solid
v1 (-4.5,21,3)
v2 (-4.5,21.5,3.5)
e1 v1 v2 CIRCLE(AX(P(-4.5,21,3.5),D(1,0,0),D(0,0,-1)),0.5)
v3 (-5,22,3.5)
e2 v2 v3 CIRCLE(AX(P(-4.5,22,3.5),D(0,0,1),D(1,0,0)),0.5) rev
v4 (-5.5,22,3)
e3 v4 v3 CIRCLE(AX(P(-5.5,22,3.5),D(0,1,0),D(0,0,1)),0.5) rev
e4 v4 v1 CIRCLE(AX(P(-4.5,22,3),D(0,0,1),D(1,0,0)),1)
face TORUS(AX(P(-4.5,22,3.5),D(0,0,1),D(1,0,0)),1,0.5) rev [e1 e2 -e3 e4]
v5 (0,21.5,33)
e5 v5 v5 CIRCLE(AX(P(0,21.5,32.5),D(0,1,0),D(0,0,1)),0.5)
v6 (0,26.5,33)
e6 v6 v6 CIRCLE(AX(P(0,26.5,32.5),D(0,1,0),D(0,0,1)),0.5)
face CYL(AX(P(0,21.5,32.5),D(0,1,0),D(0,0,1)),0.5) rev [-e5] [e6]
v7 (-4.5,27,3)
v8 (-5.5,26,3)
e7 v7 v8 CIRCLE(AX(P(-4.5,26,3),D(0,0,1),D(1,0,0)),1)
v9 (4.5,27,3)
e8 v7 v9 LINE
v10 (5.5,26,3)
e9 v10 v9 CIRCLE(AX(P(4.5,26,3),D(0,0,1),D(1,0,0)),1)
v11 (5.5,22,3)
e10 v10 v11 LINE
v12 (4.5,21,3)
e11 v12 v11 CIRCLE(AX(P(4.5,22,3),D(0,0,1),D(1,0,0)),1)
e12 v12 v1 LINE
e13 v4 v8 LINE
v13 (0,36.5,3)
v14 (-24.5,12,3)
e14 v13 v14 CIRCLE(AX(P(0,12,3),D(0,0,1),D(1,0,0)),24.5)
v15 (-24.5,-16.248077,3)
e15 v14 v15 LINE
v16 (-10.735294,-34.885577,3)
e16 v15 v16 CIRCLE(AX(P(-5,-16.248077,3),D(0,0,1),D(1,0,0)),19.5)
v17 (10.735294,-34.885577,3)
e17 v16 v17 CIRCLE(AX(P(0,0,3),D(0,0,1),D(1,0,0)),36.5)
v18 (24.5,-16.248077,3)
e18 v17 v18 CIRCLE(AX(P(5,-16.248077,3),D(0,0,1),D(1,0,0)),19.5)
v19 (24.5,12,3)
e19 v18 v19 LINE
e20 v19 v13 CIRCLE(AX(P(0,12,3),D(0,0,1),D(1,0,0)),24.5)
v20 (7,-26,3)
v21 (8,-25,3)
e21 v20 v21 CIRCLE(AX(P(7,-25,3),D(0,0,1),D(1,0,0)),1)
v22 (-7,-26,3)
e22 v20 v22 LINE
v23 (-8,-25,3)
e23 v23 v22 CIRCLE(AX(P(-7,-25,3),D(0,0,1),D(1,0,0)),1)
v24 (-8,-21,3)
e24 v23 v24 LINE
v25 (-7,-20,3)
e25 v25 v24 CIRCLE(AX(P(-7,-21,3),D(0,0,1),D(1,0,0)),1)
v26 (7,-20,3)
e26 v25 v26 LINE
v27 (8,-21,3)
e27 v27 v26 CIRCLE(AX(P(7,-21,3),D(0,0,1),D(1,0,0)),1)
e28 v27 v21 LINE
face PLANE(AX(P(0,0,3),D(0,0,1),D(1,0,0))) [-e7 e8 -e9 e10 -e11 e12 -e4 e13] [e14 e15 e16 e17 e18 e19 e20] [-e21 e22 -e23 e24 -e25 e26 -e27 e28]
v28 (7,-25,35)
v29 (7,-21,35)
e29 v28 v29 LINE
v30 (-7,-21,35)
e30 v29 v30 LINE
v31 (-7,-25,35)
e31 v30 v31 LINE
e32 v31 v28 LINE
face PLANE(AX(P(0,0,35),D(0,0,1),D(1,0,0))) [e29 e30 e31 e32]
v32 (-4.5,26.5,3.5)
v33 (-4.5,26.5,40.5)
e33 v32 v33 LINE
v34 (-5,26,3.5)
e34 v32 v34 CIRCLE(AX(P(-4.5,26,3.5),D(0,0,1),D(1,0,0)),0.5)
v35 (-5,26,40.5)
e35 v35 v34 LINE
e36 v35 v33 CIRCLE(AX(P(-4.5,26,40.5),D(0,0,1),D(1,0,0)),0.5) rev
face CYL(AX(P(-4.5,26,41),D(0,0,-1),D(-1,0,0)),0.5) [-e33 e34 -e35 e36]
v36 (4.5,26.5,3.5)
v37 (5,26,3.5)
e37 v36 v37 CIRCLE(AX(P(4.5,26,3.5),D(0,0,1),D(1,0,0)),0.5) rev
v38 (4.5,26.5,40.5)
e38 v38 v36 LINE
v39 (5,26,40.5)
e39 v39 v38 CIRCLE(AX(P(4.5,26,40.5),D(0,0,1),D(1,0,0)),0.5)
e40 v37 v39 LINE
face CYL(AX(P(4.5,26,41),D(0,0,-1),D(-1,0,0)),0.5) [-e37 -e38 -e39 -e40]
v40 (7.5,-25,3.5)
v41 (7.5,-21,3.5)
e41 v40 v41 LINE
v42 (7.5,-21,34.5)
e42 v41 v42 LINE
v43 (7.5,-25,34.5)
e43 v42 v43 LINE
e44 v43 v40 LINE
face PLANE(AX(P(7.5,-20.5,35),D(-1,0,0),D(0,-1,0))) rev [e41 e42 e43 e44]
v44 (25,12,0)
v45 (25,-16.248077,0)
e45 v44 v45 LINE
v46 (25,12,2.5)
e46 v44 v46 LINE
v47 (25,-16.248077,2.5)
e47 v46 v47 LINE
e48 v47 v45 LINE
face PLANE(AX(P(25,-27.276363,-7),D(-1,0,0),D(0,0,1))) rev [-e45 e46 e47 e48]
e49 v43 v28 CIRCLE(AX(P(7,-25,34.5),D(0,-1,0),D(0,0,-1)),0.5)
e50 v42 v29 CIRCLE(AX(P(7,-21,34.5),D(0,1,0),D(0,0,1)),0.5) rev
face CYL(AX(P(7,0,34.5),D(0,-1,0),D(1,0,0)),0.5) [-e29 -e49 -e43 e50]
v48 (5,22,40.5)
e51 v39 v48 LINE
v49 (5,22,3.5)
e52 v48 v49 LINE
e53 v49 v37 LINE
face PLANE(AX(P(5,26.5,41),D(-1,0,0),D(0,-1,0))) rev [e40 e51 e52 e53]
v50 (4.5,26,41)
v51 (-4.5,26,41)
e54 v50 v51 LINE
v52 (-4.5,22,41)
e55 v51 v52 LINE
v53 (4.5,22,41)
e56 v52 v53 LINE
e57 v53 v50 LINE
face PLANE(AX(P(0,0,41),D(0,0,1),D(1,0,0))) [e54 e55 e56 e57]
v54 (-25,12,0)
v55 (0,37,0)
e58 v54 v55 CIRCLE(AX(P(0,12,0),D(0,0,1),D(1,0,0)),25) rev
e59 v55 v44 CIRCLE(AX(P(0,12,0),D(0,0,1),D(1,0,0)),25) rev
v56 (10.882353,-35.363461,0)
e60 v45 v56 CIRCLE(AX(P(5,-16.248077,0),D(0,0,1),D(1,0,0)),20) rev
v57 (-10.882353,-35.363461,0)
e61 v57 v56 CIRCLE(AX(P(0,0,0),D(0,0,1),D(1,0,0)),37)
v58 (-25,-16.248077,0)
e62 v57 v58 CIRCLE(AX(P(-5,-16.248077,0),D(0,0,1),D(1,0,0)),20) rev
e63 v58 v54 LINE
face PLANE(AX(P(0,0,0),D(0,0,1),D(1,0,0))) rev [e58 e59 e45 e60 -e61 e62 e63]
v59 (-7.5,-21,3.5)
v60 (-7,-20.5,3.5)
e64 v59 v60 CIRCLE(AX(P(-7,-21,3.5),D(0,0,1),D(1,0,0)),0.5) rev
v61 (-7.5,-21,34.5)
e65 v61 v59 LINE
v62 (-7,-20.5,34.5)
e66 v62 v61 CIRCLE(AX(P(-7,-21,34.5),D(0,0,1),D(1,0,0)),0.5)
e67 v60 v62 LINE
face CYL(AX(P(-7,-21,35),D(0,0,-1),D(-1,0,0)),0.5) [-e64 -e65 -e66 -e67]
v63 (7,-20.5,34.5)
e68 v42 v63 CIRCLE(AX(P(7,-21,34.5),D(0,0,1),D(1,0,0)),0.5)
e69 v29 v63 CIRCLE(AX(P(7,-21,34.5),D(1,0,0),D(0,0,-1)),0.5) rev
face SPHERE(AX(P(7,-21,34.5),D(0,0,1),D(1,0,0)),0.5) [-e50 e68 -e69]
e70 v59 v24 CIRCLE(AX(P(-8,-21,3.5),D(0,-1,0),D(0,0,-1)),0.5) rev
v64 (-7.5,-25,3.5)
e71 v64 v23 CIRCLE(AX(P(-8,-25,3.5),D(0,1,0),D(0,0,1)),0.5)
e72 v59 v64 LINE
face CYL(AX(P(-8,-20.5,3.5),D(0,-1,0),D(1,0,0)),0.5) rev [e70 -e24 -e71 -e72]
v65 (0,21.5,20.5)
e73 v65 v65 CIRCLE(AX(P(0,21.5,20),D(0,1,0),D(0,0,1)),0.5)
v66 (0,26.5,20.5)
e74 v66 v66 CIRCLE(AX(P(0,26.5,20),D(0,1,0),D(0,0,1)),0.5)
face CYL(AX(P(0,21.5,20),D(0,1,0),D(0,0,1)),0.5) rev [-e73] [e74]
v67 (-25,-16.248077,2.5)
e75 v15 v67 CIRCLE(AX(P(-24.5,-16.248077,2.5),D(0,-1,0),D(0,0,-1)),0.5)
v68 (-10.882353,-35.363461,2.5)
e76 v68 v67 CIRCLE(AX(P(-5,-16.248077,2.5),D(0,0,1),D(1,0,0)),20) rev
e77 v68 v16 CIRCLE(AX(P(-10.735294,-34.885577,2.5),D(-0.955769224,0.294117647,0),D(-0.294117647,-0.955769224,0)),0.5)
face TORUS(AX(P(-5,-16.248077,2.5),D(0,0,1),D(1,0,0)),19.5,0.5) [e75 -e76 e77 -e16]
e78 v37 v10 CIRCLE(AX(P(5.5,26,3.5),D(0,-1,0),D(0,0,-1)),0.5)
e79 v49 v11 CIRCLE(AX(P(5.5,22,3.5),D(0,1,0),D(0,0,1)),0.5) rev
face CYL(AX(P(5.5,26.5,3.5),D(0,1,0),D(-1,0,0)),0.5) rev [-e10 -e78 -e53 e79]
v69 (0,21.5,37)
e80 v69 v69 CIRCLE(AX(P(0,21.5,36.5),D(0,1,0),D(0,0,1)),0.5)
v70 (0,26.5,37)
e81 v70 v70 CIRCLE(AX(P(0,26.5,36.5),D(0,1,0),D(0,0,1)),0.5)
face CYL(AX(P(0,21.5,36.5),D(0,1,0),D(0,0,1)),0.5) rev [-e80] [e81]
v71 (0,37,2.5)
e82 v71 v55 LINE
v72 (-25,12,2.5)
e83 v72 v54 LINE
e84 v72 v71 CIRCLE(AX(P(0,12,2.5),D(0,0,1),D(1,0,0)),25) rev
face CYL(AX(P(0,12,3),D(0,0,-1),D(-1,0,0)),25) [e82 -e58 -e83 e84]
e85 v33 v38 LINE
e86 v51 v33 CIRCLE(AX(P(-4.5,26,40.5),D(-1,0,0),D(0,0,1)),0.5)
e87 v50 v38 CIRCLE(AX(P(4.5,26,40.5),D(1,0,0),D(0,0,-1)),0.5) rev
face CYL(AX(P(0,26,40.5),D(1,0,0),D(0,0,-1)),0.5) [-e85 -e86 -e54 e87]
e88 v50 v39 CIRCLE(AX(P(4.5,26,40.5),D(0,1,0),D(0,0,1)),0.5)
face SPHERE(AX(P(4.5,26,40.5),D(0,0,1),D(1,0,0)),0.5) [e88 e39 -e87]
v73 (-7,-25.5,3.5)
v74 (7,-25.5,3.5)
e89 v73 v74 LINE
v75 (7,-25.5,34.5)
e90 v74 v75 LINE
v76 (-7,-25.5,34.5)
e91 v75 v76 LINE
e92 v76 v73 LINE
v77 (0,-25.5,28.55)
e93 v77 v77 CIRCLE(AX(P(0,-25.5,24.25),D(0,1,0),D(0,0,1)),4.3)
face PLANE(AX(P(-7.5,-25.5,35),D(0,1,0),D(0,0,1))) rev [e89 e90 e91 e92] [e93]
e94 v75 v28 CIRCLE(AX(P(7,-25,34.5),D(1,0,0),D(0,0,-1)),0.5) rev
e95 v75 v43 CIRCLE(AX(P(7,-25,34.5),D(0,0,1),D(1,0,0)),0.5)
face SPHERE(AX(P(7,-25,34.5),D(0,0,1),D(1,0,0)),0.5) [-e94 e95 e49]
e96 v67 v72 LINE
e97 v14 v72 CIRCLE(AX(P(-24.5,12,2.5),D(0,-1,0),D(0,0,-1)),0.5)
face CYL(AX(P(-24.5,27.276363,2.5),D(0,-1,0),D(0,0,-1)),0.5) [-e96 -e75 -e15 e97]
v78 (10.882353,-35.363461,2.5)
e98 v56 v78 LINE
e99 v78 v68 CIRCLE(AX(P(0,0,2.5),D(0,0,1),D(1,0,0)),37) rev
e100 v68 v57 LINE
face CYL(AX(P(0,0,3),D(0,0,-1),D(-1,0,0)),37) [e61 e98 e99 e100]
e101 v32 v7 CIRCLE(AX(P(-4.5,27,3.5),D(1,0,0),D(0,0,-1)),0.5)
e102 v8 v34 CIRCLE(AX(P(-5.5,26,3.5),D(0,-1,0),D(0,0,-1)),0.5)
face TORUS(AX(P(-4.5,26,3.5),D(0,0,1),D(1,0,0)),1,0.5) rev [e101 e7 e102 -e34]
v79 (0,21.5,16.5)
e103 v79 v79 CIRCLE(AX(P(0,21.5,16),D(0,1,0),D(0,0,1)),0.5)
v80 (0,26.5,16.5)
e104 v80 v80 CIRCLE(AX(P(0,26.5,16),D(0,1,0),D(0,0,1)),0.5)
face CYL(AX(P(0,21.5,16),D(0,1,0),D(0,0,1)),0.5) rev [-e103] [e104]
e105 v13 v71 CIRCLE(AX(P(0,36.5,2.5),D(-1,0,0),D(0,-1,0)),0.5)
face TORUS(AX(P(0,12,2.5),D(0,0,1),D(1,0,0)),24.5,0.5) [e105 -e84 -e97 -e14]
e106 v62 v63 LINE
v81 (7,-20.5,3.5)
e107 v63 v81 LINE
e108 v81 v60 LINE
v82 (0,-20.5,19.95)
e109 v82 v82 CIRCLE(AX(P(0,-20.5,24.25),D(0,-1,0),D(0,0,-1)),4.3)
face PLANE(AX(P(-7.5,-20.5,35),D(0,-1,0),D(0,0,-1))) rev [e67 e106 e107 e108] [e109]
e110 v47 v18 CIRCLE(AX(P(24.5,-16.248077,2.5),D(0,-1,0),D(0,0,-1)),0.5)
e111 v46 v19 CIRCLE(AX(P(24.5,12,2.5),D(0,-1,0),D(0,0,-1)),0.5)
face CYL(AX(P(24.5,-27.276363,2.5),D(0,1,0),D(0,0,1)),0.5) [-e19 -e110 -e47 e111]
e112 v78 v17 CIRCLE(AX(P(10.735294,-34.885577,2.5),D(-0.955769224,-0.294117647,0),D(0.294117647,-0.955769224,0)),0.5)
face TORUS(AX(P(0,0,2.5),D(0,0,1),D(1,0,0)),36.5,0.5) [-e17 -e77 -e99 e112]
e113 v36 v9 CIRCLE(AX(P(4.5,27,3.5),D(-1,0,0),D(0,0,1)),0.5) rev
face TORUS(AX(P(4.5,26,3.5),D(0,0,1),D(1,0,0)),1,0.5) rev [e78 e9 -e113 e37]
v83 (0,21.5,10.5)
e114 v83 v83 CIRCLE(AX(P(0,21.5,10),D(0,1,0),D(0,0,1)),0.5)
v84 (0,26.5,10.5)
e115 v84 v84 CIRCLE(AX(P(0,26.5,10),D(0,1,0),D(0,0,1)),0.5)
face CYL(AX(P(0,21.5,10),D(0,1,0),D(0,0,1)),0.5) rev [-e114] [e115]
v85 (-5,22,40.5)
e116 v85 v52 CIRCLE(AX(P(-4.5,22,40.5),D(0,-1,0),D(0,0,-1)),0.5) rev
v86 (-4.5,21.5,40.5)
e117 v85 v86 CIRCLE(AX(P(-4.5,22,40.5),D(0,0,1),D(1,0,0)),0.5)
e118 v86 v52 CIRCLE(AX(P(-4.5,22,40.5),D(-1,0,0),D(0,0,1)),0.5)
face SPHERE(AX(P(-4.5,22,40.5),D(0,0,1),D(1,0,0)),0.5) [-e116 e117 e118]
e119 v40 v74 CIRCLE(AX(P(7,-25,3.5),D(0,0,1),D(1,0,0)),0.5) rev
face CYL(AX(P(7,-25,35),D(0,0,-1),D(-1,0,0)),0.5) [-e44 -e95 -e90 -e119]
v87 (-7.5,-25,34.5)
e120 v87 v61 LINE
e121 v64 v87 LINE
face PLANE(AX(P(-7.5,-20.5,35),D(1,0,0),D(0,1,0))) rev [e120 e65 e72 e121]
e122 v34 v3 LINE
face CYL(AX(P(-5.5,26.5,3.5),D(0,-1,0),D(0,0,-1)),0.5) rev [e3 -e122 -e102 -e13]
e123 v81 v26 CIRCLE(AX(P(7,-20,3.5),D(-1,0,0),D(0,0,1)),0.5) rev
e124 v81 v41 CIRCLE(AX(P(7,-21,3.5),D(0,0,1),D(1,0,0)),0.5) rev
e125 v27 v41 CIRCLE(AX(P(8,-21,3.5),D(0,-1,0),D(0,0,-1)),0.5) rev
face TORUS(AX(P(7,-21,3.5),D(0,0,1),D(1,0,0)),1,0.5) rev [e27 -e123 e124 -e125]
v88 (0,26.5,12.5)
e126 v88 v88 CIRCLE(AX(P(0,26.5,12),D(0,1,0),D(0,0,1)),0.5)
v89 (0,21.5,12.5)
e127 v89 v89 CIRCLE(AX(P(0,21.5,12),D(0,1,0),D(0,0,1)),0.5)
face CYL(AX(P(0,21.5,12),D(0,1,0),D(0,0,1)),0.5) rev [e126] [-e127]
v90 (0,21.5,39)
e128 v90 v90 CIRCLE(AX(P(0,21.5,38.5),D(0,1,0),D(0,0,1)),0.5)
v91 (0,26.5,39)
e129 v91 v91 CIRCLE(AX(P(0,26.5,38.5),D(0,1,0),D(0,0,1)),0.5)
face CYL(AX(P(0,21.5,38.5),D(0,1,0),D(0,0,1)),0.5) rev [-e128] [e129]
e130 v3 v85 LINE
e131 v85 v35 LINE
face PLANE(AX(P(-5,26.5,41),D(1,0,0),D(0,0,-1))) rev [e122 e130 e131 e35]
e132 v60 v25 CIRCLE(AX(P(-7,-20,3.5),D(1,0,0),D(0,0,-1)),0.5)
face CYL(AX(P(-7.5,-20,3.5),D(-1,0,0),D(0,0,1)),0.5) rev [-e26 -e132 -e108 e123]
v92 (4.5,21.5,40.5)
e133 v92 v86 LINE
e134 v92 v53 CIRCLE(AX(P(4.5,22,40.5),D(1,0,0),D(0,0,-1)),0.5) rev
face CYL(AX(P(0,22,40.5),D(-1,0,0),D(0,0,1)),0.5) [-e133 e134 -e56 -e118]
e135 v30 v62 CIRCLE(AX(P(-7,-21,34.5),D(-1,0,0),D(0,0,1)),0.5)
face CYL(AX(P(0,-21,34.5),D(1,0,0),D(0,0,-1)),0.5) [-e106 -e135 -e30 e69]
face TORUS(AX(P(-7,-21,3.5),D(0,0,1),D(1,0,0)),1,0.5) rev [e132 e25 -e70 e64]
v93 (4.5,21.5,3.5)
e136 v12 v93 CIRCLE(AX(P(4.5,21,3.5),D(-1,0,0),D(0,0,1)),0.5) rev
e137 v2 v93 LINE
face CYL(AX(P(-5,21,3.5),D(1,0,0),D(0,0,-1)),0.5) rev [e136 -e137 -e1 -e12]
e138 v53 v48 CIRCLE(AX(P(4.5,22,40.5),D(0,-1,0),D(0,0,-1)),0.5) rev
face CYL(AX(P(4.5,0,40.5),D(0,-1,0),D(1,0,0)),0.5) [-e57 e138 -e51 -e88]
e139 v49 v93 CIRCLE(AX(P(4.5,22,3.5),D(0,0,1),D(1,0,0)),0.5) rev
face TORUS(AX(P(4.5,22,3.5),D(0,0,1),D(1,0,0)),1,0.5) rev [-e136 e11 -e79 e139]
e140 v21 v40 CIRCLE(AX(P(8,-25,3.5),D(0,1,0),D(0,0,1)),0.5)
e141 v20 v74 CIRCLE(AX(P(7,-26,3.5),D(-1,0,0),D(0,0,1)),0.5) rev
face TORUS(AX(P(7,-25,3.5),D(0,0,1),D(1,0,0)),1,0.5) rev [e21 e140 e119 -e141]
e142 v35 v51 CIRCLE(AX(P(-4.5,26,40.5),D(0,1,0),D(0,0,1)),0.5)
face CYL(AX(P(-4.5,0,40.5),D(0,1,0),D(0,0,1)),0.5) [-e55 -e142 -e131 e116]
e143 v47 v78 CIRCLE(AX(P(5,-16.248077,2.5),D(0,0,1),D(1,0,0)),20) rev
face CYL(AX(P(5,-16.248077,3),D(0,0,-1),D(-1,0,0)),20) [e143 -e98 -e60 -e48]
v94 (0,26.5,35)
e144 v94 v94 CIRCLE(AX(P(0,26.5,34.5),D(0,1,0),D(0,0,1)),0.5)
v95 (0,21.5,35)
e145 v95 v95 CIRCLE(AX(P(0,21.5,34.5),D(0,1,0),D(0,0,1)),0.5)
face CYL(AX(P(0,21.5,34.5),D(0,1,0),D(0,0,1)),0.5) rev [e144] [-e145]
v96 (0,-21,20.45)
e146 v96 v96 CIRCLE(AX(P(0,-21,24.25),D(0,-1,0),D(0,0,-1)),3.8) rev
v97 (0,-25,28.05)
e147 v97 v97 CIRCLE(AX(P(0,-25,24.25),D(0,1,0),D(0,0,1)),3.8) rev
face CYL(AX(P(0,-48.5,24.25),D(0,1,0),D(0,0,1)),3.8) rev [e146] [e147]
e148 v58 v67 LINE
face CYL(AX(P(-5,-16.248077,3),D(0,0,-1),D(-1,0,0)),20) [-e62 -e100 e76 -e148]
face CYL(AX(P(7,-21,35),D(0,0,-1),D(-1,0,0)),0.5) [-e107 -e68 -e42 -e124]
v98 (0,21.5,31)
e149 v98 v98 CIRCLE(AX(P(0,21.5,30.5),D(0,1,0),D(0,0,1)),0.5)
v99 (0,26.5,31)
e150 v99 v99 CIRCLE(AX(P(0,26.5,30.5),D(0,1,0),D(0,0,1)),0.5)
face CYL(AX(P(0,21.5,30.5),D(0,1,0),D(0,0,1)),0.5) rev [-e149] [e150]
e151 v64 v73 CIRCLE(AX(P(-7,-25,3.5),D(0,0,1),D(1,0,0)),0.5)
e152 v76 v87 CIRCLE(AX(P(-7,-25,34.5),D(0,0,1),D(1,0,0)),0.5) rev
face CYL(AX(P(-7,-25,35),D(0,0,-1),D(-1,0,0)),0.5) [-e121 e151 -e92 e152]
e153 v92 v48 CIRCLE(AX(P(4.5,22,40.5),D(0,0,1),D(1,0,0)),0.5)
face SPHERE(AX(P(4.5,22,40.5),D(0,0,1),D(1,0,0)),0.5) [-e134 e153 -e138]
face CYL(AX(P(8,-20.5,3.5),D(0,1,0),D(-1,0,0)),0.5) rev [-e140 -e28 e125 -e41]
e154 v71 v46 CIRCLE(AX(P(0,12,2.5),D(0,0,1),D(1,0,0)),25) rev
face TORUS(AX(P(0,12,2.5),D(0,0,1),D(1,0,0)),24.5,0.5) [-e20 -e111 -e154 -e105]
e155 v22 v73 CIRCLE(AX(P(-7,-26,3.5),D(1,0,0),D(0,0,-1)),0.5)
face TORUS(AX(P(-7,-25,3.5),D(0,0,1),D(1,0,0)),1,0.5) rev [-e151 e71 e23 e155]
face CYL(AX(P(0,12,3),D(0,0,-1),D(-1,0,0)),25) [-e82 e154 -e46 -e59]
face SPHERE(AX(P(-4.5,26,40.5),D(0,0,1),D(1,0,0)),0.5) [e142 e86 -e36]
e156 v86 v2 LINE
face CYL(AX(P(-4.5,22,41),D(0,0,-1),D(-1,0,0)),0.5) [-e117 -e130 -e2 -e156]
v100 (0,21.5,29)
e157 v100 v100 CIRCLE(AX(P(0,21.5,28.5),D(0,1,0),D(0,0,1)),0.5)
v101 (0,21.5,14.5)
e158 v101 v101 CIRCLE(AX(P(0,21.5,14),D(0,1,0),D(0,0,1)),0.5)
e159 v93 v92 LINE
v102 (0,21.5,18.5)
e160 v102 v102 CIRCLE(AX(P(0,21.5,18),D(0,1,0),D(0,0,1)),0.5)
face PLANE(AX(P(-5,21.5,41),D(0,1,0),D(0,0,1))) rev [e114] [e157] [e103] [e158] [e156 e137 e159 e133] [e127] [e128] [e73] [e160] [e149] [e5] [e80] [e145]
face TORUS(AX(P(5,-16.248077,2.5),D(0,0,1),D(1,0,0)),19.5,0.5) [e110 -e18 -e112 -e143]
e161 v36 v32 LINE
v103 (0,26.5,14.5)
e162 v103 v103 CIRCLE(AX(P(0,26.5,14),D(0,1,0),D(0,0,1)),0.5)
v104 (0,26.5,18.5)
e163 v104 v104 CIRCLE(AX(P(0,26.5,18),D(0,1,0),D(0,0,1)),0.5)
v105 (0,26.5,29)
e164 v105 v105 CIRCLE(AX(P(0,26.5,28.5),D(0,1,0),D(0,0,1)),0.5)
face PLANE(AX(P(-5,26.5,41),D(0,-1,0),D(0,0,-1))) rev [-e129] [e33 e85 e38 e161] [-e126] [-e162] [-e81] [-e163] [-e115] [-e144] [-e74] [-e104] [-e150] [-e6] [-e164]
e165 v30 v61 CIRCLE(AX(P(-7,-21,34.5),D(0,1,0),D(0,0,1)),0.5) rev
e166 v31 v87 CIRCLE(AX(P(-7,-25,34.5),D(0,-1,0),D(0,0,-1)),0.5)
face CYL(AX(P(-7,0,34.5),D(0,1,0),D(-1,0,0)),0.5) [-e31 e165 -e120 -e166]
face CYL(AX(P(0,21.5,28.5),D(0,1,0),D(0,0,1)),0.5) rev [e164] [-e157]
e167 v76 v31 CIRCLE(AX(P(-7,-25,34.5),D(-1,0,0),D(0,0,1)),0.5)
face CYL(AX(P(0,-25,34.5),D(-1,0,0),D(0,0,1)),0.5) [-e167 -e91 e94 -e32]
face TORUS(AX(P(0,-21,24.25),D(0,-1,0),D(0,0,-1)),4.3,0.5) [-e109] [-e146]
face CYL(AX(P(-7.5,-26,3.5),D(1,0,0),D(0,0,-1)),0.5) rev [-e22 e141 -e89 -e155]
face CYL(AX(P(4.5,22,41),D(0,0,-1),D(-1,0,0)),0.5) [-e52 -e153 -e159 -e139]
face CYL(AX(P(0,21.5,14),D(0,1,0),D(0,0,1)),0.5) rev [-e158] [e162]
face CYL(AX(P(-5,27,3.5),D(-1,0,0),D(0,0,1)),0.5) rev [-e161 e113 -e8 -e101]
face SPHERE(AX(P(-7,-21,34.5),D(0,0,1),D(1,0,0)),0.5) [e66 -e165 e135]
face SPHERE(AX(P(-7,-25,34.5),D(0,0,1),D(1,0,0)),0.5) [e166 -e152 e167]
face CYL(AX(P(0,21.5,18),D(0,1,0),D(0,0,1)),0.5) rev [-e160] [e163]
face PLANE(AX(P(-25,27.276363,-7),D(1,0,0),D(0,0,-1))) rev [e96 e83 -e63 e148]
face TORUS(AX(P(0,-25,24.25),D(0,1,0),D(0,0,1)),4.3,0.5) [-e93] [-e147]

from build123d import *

# Parameters (mm, degrees)
SKETCH1_R           = 37
BOSS_EXTRUDE1_DEPTH = 3
CUT_EXTRUDE3_START  = -10
CUT_EXTRUDE3_DEPTH  = 10
FILLET2_R           = 25
FILLET3_R           = 20
SKETCH2_W           = 10
SKETCH2_H           = 5
BOSS_EXTRUDE2_DEPTH = 38
SKETCH3_R           = 0.5
CUT_EXTRUDE1_DEPTH  = 5
SKETCH4_W           = 15
SKETCH4_H           = 5
BOSS_EXTRUDE3_DEPTH = 32
SKETCH5_R           = 3.8
CUT_EXTRUDE2_DEPTH  = 28
FILLET4_R           = 0.5


with BuildPart() as part:
    # Sketch1 → Boss-Extrude1 (new body)
    with BuildSketch(Plane.XY):
        Circle(SKETCH1_R)
    extrude(amount=BOSS_EXTRUDE1_DEPTH)

    # Sketch6 → Cut-Extrude3 (cut)
    with BuildSketch(Plane.XY.offset(3).offset(CUT_EXTRUDE3_START)):
        with BuildLine():
            Line((-25, 27.276363394), (-25, -27.276363394))
            ThreePointArc((-25, -27.276363394), (-37, 0), (-25, 27.276363394))
        make_face()
        with BuildLine():
            Line((25, -27.276363394), (25, 27.276363394))
            ThreePointArc((25, 27.276363394), (37, 0), (25, -27.276363394))
        make_face()
    extrude(amount=CUT_EXTRUDE3_DEPTH, mode=Mode.SUBTRACT)

    # Fillet2
    fillet2_edges = [part.edges().sort_by_distance(p)[0] for p in [
        (-25, 27.276363394, 1.5),
        (25, 27.276363394, 1.5),
    ]]
    fillet(fillet2_edges, radius=FILLET2_R - 0.0001)  # a hair under: the kernel refuses the full size

    # Fillet3
    fillet3_edges = [part.edges().sort_by_distance(p)[0] for p in [
        (-25, -27.276363394, 1.5),
        (25, -27.276363394, 1.5),
    ]]
    fillet(fillet3_edges, radius=FILLET3_R)

    # Sketch2 → Boss-Extrude2 (add)
    with BuildSketch(Plane.XY.offset(3)):
        with Locations((0, 24)):
            Rectangle(SKETCH2_W, SKETCH2_H)
    extrude(amount=BOSS_EXTRUDE2_DEPTH)

    # Sketch3 → Cut-Extrude1 (cut)
    with BuildSketch(Plane(origin=(0, 26.5, 0), x_dir=(1, 0, 0), z_dir=(0, 1, 0))):
        with Locations(Location((0, -10, 0), (0, 0, 270))):
            Circle(SKETCH3_R)
        with Locations(Location((0, -12, 0), (0, 0, 270))):
            Circle(SKETCH3_R)
        with Locations(Location((0, -14, 0), (0, 0, 270))):
            Circle(SKETCH3_R)
        with Locations(Location((0, -16, 0), (0, 0, 270))):
            Circle(SKETCH3_R)
        with Locations(Location((0, -18, 0), (0, 0, 270))):
            Circle(SKETCH3_R)
        with Locations(Location((0, -20, 0), (0, 0, 270))):
            Circle(SKETCH3_R)
        with Locations(Location((0, -38.5, 0), (0, 0, 270))):
            Circle(SKETCH3_R)
        with Locations(Location((0, -36.5, 0), (0, 0, 270))):
            Circle(SKETCH3_R)
        with Locations(Location((0, -34.5, 0), (0, 0, 270))):
            Circle(SKETCH3_R)
        with Locations(Location((0, -32.5, 0), (0, 0, 270))):
            Circle(SKETCH3_R)
        with Locations(Location((0, -30.5, 0), (0, 0, 270))):
            Circle(SKETCH3_R)
        with Locations(Location((0, -28.5, 0), (0, 0, 270))):
            Circle(SKETCH3_R)
    extrude(amount=-CUT_EXTRUDE1_DEPTH, mode=Mode.SUBTRACT)

    # Sketch4 → Boss-Extrude3 (add)
    with BuildSketch(Plane.XY.offset(3)):
        with Locations((0, -23)):
            Rectangle(SKETCH4_W, SKETCH4_H)
    extrude(amount=BOSS_EXTRUDE3_DEPTH)

    # Sketch5 → Cut-Extrude2 (cut)
    with BuildSketch(Plane(origin=(0, -20.5, 0), x_dir=(1, 0, 0), z_dir=(0, 1, 0))):
        with Locations(Location((0, -24.25, 0), (0, 0, 270))):
            Circle(SKETCH5_R)
    extrude(amount=-CUT_EXTRUDE2_DEPTH, mode=Mode.SUBTRACT)

    # Fillet4
    fillet4_edges = [part.edges().sort_by_distance(p)[0] for p in [
        (7.5, -23, 3),
        (7.5, -25.5, 19),
        (0, -20.5, 3),
        (7.5, -20.5, 19),
        (-7.5, -23, 3),
        (-7.5, -20.5, 19),
        (0, -25.5, 3),
        (-7.5, -25.5, 19),
        (7.5, -23, 35),
        (0, -20.5, 35),
        (-7.5, -23, 35),
        (0, -25.5, 35),
        (0, -25.5, 20.45),
        (0, -20.5, 20.45),
        (25, -2.123988405, 3),
        (17.677772475, 29.677625162, 3),
        (-17.677772475, 29.677625162, 3),
        (0, -37, 3),
        (-25, -2.123988405, 3),
        (-21.087993331, -28.129847325, 3),
        (21.087993331, -28.129847325, 3),
        (5, 24, 3),
        (5, 21.5, 22),
        (0, 26.5, 3),
        (5, 26.5, 22),
        (-5, 24, 3),
        (-5, 26.5, 22),
        (0, 21.5, 3),
        (-5, 21.5, 22),
        (5, 24, 41),
        (0, 26.5, 41),
        (-5, 24, 41),
        (0, 21.5, 41),
    ]]
    fillet(fillet4_edges, radius=FILLET4_R)


solid = part.part
